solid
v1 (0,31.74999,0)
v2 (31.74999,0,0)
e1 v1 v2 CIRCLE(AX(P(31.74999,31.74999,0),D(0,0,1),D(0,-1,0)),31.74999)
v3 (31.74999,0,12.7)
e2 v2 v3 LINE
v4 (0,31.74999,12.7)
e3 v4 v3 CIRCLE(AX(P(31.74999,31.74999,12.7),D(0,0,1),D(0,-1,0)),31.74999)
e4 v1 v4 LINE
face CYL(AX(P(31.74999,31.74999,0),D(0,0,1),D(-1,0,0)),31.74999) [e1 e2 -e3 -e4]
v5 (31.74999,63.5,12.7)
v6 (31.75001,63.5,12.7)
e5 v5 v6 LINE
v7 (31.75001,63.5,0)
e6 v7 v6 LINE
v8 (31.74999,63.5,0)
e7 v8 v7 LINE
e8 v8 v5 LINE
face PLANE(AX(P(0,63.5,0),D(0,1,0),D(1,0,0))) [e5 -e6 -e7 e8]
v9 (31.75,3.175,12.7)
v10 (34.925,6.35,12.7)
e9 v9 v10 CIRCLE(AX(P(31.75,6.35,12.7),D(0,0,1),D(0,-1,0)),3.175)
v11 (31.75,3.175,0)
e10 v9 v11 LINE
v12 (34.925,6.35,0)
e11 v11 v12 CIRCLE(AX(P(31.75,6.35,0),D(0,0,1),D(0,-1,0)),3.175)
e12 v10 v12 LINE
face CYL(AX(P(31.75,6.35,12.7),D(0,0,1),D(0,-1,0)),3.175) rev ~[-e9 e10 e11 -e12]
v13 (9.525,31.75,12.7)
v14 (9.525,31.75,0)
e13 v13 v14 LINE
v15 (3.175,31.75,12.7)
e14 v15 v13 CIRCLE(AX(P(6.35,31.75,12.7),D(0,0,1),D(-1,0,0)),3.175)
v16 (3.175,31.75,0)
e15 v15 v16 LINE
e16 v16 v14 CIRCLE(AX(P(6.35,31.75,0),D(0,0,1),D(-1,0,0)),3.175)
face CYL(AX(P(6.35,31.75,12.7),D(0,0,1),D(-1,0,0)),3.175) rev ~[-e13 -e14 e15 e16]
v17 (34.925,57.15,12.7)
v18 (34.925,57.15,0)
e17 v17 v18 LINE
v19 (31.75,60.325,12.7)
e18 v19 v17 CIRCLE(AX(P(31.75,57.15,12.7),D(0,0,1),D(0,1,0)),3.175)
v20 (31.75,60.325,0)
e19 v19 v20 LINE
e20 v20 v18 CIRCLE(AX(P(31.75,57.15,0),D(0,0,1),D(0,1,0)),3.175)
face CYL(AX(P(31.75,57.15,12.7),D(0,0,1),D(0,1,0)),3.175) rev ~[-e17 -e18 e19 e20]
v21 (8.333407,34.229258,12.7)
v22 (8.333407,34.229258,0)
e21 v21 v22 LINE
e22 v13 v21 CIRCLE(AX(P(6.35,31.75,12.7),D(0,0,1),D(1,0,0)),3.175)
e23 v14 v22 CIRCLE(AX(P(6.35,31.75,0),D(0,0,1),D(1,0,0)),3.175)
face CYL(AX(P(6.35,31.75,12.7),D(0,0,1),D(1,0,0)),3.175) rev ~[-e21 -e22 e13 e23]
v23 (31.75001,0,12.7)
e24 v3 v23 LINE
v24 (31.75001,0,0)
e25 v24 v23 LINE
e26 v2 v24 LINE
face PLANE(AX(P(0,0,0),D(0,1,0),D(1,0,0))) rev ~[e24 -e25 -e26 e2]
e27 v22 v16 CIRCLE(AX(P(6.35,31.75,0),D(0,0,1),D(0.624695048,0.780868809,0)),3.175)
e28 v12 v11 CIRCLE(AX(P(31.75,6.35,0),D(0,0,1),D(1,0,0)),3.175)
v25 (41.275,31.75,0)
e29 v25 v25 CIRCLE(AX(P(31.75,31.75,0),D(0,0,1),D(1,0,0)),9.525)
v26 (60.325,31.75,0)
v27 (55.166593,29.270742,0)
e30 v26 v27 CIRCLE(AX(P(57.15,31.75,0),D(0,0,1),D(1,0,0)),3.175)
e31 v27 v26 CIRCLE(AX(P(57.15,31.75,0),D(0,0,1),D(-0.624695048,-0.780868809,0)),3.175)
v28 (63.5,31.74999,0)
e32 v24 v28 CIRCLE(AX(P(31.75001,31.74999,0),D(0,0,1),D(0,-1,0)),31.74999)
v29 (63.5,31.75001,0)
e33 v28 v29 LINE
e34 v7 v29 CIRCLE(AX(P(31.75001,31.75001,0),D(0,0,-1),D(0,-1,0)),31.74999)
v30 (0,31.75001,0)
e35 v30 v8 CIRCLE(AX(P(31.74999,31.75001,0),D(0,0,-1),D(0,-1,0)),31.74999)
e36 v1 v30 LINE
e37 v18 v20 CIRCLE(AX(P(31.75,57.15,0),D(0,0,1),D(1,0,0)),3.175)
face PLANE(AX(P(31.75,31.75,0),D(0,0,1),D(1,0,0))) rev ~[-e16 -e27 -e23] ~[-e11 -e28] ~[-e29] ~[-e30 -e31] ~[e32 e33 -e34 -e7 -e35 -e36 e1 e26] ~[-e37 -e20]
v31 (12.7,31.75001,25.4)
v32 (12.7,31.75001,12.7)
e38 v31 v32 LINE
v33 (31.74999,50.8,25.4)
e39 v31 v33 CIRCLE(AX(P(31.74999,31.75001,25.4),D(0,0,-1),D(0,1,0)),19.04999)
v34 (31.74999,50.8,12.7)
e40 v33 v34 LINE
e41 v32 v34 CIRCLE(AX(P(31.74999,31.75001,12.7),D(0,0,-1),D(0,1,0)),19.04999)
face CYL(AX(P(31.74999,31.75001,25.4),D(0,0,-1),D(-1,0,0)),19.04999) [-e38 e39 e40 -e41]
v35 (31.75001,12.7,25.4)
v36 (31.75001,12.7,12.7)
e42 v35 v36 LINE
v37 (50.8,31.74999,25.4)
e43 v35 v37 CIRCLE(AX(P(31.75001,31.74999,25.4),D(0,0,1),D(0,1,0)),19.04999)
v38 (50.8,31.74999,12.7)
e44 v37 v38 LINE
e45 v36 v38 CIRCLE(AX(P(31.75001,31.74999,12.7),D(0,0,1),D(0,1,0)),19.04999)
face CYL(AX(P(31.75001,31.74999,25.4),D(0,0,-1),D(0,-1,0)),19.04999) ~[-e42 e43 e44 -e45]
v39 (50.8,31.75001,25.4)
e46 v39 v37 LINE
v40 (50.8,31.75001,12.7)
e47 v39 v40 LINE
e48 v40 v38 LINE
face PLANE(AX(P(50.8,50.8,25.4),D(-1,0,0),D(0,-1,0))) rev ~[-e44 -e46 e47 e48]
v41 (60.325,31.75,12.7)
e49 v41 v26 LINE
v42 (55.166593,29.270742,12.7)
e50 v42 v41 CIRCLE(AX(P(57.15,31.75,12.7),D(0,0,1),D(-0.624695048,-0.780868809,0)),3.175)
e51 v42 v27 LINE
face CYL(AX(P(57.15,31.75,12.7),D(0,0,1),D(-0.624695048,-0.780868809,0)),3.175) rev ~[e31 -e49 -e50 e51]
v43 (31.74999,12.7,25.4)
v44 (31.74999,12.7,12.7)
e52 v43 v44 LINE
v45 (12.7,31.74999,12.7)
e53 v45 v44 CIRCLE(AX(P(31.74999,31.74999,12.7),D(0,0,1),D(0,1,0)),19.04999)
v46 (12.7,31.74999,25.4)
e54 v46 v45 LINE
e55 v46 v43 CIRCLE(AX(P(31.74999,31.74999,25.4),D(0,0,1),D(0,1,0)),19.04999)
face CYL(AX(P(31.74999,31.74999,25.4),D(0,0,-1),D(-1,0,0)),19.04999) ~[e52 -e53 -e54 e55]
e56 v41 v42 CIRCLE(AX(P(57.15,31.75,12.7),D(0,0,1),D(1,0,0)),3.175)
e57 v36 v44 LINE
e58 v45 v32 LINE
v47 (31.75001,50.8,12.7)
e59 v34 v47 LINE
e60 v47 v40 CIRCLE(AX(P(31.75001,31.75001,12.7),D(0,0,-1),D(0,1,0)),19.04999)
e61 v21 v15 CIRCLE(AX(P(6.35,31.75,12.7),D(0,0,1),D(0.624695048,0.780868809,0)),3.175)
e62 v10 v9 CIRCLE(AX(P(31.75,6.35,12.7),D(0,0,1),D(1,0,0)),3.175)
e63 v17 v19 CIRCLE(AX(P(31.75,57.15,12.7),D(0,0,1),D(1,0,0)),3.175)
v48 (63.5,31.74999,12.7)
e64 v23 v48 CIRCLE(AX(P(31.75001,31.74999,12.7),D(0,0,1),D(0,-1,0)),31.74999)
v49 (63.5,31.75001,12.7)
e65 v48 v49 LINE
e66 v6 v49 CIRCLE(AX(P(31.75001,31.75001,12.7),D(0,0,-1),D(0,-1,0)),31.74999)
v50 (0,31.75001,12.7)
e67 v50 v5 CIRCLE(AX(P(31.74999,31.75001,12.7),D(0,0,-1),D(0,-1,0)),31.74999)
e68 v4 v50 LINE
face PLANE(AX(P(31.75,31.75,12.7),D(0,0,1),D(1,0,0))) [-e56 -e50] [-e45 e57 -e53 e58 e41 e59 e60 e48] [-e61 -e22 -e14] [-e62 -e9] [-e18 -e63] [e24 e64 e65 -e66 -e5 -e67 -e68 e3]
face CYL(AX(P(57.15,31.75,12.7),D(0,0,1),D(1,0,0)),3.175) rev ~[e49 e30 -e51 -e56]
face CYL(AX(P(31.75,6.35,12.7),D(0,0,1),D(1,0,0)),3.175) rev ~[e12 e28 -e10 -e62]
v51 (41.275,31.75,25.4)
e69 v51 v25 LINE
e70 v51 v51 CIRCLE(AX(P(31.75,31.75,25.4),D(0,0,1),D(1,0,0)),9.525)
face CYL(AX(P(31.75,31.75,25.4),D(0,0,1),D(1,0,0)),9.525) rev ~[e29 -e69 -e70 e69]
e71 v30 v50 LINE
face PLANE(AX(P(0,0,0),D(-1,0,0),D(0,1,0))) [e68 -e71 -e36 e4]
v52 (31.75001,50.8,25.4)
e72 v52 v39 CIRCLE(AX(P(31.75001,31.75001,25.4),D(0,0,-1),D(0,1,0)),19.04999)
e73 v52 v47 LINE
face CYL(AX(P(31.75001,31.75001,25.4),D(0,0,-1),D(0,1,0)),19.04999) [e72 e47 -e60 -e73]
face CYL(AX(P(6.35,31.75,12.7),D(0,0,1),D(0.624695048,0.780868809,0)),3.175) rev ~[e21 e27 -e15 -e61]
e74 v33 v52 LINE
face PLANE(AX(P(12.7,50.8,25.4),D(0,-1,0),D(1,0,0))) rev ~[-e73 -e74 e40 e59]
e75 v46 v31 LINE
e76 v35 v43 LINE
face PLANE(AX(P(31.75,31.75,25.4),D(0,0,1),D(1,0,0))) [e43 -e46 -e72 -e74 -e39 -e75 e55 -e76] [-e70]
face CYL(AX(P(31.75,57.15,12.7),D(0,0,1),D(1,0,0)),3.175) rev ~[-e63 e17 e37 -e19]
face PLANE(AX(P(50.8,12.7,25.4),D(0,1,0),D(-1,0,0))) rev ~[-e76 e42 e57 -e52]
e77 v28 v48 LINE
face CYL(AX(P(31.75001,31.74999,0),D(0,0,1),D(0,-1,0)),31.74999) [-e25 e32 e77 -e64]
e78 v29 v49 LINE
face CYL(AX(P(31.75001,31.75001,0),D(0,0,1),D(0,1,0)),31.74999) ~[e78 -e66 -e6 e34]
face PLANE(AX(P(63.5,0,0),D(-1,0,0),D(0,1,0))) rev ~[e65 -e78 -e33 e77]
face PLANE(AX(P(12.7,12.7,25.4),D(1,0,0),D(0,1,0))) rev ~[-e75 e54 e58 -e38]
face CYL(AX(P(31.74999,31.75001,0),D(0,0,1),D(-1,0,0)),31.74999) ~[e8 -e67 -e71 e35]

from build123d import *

# Parameters (mm, degrees)
F0_W     = 63.5
F0_H     = 63.5
F1_DEPTH = 25.4
F2_W     = 63.5
F2_H     = 63.5
F3_DEPTH = 12.7
F5_DEPTH = 25.4
F7_DEPTH = 25.4
F8_R     = 31.74999
F9_R     = 19.04999


# Not quite as in the source:
# - a fillet or chamfer is up to 0.001 mm smaller than in the source, because OpenCascade refuses the exact size


with BuildPart() as f1:
    # F0 (on Top) → F1 (new body)
    with BuildSketch(Plane.XY):
        with Locations((31.75, 31.75)):
            Rectangle(F0_W, F0_H)
    extrude(amount=F1_DEPTH)

    # F2 (on face) → F3 (cut)
    with BuildSketch(Plane.XY.offset(25.4)):
        with Locations((31.75, 31.75)):
            Rectangle(F2_W, F2_H)
        Polygon((12.7, 50.8), (31.75, 50.8), (50.8, 50.8), (50.8, 31.75), (50.8, 12.7), (12.7, 12.7), align=None, mode=Mode.SUBTRACT)
    extrude(amount=-F3_DEPTH, mode=Mode.SUBTRACT)

    # F4 (on face) → F5 (cut)
    with BuildSketch(Plane.XY.offset(12.7)):
        with BuildLine():
            ThreePointArc((8.333406776, 34.22925847), (4.9746257807, 34.6116377753), (3.175, 31.75))
            Line((3.175, 31.75), (6.35, 31.75))
            Line((6.35, 31.75), (8.333406776, 34.22925847))
        make_face()
        with BuildLine():
            ThreePointArc((34.925, 57.15), (33.9950640303, 59.3950640303), (31.75, 60.325))
            ThreePointArc((31.75, 60.325), (29.5049359697, 54.9049359697), (34.925, 57.15))
        make_face()
        with BuildLine():
            Line((6.35, 31.75), (3.175, 31.75))
            ThreePointArc((3.175, 31.75), (6.35, 28.575), (9.525, 31.75))
            ThreePointArc((9.525, 31.75), (9.2116377753, 33.1253742193), (8.333406776, 34.22925847))
            Line((8.333406776, 34.22925847), (6.35, 31.75))
        make_face()
        with BuildLine():
            ThreePointArc((55.166593224, 29.27074153), (58.5253742193, 28.8883622247), (60.325, 31.75))
            Line((60.325, 31.75), (57.15, 31.75))
            Line((57.15, 31.75), (55.166593224, 29.27074153))
        make_face()
        with BuildLine():
            Line((57.15, 31.75), (60.325, 31.75))
            ThreePointArc((60.325, 31.75), (55.7746257807, 34.6116377753), (55.166593224, 29.27074153))
            Line((55.166593224, 29.27074153), (57.15, 31.75))
        make_face()
        with BuildLine():
            ThreePointArc((34.925, 6.35), (29.5049359697, 8.5950640303), (31.75, 3.175))
            ThreePointArc((31.75, 3.175), (33.9950640303, 4.1049359697), (34.925, 6.35))
        make_face()
    extrude(amount=-F5_DEPTH, mode=Mode.SUBTRACT)

    # F6 (on face) → F7 (cut)
    with BuildSketch(Plane.XY.offset(25.4)):
        with BuildLine():
            ThreePointArc((41.275, 31.75), (38.4851920908, 38.4851920908), (31.75, 41.275))
            Line((31.75, 41.275), (31.75, 22.225))
            ThreePointArc((31.75, 22.225), (38.4851920908, 25.0148079092), (41.275, 31.75))
        make_face()
        with BuildLine():
            Line((31.75, 22.225), (31.75, 41.275))
            ThreePointArc((31.75, 41.275), (22.225, 31.75), (31.75, 22.225))
        make_face()
    extrude(amount=-F7_DEPTH, mode=Mode.SUBTRACT)

    # F8 (radius 31.75 in the source; OpenCascade refuses exactly that, so slightly less here)
    f8_edges = [f1.edges().sort_by_distance(p)[0] for p in [
        (0, 0, 6.35),
        (63.5, 0, 6.35),
        (63.5, 63.5, 6.35),
        (0, 63.5, 6.35),
    ]]
    fillet(f8_edges, radius=F8_R)

    # F9 (radius 19.05 in the source; OpenCascade refuses exactly that, so slightly less here)
    f9_edges = [f1.edges().sort_by_distance(p)[0] for p in [
        (12.7, 12.7, 19.05),
        (50.8, 12.7, 19.05),
        (12.7, 50.8, 19.05),
        (50.8, 50.8, 19.05),
    ]]
    fillet(f9_edges, radius=F9_R)


solid = f1.part
